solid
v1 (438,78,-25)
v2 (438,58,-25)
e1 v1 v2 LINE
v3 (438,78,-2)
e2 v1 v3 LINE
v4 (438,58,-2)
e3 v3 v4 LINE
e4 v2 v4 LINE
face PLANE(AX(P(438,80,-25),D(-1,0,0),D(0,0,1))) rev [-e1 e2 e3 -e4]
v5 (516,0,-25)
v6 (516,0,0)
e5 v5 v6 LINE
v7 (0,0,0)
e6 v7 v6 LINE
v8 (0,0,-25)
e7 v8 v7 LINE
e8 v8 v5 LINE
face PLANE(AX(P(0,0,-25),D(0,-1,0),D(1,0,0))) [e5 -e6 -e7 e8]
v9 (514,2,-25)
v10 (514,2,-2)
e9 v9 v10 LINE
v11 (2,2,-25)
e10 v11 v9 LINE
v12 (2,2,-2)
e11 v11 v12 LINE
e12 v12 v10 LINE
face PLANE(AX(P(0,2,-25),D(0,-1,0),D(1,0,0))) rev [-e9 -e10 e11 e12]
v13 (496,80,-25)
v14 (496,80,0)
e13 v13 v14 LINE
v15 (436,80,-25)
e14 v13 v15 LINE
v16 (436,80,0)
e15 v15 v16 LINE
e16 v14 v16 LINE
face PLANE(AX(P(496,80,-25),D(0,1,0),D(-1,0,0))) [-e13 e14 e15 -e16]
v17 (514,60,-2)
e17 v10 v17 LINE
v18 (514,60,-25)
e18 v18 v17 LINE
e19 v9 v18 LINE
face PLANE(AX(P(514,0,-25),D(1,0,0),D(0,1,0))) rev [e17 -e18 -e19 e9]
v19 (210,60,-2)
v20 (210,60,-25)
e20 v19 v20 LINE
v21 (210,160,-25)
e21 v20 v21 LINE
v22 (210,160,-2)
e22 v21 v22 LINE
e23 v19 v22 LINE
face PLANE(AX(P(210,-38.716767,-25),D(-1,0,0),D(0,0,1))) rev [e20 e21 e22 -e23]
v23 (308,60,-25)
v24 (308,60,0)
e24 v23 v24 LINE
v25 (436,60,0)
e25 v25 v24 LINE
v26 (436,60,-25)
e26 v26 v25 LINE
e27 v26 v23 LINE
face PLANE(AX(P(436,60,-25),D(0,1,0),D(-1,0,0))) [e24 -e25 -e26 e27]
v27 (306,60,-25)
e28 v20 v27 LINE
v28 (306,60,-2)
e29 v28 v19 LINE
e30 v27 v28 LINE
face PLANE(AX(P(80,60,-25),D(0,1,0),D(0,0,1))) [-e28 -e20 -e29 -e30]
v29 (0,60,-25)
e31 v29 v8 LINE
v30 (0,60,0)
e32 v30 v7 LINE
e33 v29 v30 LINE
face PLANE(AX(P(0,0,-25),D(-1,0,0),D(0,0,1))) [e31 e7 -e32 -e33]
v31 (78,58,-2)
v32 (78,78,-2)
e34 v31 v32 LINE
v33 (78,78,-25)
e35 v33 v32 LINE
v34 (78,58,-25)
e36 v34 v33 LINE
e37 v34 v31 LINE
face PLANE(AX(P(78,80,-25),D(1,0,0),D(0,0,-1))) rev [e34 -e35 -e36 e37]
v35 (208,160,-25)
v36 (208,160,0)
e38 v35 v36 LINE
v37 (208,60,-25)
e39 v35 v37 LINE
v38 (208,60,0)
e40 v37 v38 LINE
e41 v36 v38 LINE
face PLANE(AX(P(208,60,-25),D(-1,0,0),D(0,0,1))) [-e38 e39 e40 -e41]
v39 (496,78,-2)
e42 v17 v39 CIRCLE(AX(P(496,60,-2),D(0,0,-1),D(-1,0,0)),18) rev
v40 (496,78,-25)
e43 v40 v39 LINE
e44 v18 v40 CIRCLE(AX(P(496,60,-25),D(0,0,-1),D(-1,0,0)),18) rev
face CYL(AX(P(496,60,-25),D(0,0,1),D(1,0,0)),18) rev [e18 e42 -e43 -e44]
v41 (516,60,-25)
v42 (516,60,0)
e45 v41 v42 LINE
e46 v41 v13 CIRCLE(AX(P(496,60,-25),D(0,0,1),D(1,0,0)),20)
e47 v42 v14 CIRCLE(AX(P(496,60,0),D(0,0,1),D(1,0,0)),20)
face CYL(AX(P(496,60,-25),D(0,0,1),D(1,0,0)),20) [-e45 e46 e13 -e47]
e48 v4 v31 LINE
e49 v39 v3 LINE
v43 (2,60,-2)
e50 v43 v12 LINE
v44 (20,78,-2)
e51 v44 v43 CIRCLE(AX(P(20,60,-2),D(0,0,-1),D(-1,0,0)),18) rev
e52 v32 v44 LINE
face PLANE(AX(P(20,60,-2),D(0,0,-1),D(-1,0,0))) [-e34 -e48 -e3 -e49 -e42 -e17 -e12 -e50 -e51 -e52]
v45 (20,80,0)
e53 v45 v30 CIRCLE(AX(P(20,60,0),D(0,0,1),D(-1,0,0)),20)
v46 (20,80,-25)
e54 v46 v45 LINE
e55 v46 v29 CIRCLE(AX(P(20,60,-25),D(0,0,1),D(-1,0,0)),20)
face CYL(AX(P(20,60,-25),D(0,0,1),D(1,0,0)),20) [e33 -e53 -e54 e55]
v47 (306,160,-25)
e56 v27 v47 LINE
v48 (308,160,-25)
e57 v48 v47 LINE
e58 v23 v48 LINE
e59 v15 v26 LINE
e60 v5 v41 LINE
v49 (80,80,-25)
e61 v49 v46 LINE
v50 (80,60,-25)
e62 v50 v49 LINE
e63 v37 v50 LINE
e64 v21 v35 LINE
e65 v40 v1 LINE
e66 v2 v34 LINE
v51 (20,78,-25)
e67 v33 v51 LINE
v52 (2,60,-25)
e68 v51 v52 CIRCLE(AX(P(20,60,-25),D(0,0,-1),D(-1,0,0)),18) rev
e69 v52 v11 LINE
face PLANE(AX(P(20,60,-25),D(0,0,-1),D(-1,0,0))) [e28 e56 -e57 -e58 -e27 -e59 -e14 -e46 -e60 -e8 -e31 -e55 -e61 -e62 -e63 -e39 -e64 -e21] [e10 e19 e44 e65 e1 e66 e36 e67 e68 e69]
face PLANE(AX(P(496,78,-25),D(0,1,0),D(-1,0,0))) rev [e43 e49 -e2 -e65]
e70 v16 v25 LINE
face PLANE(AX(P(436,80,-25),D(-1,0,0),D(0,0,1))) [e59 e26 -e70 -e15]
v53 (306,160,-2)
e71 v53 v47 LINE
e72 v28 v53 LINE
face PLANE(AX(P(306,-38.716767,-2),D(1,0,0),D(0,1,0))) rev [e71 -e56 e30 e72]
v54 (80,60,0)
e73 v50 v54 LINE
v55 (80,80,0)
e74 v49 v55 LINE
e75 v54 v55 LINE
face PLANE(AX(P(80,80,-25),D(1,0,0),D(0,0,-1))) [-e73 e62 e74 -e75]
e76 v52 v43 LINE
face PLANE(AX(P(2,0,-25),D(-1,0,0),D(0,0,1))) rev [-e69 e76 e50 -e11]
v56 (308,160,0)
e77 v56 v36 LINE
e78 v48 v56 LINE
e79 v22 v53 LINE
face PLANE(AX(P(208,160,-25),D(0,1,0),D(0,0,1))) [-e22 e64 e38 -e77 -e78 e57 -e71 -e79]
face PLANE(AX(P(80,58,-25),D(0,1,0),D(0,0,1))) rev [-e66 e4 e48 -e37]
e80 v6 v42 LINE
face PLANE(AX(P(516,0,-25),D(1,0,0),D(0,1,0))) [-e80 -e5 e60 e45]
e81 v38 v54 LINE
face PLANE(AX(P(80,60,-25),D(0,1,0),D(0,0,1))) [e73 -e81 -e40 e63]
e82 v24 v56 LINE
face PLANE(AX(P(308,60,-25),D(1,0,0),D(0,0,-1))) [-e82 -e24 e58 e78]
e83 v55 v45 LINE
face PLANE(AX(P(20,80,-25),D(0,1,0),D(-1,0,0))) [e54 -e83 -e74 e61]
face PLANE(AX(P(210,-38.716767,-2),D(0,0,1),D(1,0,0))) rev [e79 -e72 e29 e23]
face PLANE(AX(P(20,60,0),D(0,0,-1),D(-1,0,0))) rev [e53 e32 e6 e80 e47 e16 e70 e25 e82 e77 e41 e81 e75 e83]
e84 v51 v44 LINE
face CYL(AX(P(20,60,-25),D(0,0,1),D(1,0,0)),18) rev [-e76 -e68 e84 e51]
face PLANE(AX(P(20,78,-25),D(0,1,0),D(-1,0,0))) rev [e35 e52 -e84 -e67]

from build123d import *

# Parameters (mm, degrees)
BOSS_EXTRUDE1_DEPTH = 25
SKETCH2_W           = 96
SKETCH2_H           = 23
CUT_EXTRUDE1_DEPTH  = 100
SHELL3_START        = -25
SHELL3_DEPTH        = 23


# Read off the part's stored shape, not the designer's step: Shell3
with BuildPart() as part:
    # Sketch1 → Boss-Extrude1 (new body)
    with BuildSketch(Plane.XY):
        with BuildLine():
            Line((0, 0), (516, 0))
            Line((516, 0), (516, 60))
            ThreePointArc((516, 60), (510.142135624, 74.142135624), (496, 80))
            Line((496, 80), (436, 80))
            Line((436, 80), (436, 60))
            Line((436, 60), (308, 60))
            Line((308, 60), (308, 160))
            Line((308, 160), (208, 160))
            Line((208, 160), (208, 60))
            Line((208, 60), (80, 60))
            Line((80, 60), (80, 80))
            Line((80, 80), (20, 80))
            ThreePointArc((20, 80), (5.857864376, 74.142135624), (0, 60))
            Line((0, 60), (0, 0))
        make_face()
    extrude(amount=-BOSS_EXTRUDE1_DEPTH)

    # Sketch2 → Cut-Extrude1 (cut)
    with BuildSketch(Plane(origin=(0, 160, 0), x_dir=(1, 0, 0), z_dir=(0, 1, 0))):
        with Locations((258, 13.5)):
            Rectangle(SKETCH2_W, SKETCH2_H)
    extrude(amount=-CUT_EXTRUDE1_DEPTH, mode=Mode.SUBTRACT)

    # Shell3 outline → Shell3 (cut)
    with BuildSketch(Plane.XY.offset(SHELL3_START)):
        with BuildLine():
            ThreePointArc((20, 78), (7.272077939, 72.727922061), (2, 60))
            Line((2, 60), (2, 2))
            Line((2, 2), (514, 2))
            Line((514, 2), (514, 60))
            ThreePointArc((514, 60), (508.727922061, 72.727922061), (496, 78))
            Line((496, 78), (438, 78))
            Line((438, 78), (438, 58))
            Line((438, 58), (78, 58))
            Line((78, 58), (78, 78))
            Line((78, 78), (20, 78))
        make_face()
    extrude(amount=SHELL3_DEPTH, mode=Mode.SUBTRACT)


solid = part.part
